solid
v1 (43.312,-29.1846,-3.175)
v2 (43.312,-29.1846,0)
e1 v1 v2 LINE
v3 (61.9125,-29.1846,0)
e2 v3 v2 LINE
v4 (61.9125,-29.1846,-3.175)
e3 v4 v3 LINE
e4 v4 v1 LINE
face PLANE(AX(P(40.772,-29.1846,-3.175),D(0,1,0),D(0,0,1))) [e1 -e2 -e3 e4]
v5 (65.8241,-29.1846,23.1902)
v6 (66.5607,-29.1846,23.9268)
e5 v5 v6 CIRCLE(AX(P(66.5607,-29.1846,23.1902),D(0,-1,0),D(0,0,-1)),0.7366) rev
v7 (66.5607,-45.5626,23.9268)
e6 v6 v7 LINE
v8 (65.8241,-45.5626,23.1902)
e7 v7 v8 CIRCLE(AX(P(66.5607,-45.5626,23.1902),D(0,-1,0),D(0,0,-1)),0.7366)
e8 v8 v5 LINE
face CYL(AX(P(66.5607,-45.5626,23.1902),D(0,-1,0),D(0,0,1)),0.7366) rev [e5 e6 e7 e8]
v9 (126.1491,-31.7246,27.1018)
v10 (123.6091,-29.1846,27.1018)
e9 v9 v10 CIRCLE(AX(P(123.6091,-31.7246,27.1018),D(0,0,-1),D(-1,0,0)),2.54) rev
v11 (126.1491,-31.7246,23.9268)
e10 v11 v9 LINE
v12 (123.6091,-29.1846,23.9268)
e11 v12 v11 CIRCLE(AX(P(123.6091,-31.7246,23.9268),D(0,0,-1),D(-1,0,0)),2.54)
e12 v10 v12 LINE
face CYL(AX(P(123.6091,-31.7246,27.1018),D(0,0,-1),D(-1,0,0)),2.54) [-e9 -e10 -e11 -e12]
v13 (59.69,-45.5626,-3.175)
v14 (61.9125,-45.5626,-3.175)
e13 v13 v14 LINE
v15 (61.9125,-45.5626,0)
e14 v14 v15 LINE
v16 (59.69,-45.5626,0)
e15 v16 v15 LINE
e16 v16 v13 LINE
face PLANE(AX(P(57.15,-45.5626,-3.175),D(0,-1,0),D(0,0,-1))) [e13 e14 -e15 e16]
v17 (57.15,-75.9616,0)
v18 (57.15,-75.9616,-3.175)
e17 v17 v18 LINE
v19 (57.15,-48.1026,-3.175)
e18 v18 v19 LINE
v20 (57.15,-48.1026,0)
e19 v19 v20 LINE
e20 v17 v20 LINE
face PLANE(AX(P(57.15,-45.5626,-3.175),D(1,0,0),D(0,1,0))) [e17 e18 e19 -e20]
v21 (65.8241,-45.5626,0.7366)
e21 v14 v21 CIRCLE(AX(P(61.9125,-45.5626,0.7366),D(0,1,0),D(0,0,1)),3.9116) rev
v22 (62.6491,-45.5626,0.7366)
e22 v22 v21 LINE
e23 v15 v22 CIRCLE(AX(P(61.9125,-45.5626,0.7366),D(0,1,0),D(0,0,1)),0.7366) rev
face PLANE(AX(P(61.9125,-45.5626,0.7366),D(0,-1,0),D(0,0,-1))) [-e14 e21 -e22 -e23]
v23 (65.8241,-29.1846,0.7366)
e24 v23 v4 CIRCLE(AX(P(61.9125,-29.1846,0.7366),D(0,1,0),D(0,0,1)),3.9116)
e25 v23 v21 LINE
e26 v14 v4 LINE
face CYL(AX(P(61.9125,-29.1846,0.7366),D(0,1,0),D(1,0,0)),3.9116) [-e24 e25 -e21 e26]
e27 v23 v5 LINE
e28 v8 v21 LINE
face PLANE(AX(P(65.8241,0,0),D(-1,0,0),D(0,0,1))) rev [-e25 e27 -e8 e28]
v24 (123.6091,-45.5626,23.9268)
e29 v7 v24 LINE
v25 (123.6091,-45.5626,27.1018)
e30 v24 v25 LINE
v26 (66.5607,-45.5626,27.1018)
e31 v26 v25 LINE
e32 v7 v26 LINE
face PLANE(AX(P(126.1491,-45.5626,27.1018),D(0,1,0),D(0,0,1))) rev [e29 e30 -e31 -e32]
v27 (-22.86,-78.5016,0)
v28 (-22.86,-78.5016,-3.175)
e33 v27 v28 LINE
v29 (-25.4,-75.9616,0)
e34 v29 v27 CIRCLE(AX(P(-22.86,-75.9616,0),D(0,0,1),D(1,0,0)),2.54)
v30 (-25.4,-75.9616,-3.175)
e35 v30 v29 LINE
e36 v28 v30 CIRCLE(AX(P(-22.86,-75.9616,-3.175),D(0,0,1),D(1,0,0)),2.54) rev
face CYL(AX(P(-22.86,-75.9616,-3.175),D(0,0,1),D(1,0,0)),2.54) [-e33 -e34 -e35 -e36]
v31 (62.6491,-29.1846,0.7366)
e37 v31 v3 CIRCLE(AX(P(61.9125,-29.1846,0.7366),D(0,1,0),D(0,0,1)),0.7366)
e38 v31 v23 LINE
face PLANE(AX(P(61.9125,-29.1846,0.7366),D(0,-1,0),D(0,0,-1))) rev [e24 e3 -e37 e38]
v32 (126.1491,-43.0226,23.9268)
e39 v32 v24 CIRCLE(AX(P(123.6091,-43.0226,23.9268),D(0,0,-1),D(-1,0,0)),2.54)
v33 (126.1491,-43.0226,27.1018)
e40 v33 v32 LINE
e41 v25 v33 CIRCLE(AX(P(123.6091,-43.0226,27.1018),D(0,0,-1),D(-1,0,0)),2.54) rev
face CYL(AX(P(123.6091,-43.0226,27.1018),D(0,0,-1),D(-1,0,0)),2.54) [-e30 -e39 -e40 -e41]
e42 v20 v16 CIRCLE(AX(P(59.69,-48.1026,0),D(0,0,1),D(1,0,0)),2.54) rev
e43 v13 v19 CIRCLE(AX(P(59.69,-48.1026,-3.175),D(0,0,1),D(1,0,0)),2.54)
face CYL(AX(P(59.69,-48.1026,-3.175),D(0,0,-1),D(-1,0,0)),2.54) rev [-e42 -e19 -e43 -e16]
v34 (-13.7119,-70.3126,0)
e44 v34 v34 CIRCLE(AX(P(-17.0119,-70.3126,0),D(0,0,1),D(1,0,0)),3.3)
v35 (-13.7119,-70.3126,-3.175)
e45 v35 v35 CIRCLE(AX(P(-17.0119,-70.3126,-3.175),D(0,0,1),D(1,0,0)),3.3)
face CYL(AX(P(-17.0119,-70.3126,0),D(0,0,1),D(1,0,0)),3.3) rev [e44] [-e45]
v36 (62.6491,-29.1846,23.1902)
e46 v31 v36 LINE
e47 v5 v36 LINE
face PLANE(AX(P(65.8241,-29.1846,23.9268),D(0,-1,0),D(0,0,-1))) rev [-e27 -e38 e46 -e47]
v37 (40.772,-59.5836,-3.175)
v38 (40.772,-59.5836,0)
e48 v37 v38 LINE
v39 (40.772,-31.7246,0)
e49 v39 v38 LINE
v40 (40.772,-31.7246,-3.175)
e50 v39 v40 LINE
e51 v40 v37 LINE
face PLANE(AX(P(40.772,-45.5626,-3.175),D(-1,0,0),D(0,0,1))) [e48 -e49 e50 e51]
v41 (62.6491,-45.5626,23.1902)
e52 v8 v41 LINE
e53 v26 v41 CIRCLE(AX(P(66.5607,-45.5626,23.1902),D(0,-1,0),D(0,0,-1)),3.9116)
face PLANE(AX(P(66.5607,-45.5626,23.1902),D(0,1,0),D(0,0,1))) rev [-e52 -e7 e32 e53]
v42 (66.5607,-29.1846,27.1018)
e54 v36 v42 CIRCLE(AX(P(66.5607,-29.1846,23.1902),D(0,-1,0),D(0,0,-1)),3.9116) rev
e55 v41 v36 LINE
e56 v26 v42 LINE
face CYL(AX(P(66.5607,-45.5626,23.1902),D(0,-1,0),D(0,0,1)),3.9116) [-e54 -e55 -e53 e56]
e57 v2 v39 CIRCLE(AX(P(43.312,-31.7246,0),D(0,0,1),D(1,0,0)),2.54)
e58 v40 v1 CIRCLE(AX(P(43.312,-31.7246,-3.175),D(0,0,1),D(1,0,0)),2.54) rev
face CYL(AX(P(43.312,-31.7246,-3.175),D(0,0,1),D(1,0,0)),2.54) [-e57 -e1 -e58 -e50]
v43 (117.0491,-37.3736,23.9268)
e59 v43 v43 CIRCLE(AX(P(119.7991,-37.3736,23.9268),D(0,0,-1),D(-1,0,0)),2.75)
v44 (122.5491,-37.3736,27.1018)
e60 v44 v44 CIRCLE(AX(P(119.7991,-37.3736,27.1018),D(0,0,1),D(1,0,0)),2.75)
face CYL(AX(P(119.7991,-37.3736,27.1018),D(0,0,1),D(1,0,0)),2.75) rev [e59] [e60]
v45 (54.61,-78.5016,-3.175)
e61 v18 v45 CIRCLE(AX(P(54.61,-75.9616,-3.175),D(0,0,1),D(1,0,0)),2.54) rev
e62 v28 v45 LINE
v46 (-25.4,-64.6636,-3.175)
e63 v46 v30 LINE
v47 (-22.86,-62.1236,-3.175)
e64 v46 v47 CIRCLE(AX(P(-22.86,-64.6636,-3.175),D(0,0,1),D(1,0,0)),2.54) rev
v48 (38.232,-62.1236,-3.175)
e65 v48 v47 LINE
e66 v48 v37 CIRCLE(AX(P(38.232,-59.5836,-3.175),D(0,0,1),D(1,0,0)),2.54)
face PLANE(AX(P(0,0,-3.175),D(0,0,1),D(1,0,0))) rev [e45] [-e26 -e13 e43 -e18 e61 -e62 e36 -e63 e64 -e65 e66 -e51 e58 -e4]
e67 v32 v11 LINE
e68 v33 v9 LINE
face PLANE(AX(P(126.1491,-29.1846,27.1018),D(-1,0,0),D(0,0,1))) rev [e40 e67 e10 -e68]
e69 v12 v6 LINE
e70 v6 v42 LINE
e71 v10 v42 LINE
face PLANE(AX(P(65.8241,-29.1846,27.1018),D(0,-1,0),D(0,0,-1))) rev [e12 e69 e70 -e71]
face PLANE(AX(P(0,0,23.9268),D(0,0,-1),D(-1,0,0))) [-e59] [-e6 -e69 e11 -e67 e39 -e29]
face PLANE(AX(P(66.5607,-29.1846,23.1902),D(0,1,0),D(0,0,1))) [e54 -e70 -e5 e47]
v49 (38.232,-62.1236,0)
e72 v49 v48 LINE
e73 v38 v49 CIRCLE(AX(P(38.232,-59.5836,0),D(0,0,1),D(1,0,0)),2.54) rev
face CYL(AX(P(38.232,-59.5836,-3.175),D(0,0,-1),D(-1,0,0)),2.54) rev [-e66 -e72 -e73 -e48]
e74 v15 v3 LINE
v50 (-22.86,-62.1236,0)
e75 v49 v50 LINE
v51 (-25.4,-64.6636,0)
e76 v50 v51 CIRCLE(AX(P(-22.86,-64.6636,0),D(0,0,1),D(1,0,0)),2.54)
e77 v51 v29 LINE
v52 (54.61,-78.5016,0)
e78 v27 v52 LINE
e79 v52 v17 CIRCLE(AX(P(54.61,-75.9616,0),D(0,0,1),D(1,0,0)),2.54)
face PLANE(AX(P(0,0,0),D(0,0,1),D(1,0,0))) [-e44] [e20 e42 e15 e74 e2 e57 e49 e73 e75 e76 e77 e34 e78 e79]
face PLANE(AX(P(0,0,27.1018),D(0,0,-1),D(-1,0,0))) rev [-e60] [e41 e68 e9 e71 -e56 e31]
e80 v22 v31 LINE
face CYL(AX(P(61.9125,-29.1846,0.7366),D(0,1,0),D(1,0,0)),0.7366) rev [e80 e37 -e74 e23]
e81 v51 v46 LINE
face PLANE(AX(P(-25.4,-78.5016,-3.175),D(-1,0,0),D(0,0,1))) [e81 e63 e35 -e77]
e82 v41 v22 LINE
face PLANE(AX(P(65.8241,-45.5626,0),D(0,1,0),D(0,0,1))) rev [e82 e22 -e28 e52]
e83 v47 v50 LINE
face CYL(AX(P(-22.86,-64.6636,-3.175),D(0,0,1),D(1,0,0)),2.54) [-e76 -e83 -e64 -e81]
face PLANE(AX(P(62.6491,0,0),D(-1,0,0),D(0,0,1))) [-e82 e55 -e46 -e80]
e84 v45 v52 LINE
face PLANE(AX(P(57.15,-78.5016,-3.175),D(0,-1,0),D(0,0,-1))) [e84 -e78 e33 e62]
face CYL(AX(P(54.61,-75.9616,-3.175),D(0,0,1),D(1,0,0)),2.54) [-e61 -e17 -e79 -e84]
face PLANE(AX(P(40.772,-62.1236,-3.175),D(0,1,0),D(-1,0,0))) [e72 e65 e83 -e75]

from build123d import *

# Parameters (mm, degrees)
BASE_FLANGE1_DEPTH           = 3.175
EDGE_FLANGE1_DEPTH           = 16.378
EDGE_FLANGE2_STRIP_W         = 14.1732
EDGE_FLANGE2_STRIP_H         = 3.175
EDGE_FLANGE2_STRIP_CUT_DEPTH = 16.378
EDGE_FLANGE2_DEPTH           = 16.378
M5_CLEARANCE_HOLE1_D         = 5.5
M6_CLEARANCE_HOLE1_D         = 6.6
FILLET1_R                    = 2.54


# Sheet-metal steps are written as plain solids
with BuildPart() as part:
    # Sketch1 → Base-Flange1 (new body)
    with BuildSketch(Plane.XY):
        Polygon((40.772, -29.184600001), (40.772, -45.562600001), (40.772, -62.123600001), (-25.39999999, -62.123600001), (-25.39999999, -78.501600001), (57.15000001, -78.501600001), (57.15000001, -45.562600001), (61.9125, -45.562600001), (61.9125, -29.184600001), align=None)
    extrude(amount=-BASE_FLANGE1_DEPTH)

    # Edge-Flange1 section (across the edge) → Edge-Flange1 (add)
    with BuildSketch(Plane(origin=(62.6491, -45.562600001, 0), x_dir=(-1, 0, 0), z_dir=(0, 1, 0))):
        with BuildLine():
            Line((-3.175, 0.7366), (-3.175, 23.9268))
            Line((-3.175, 23.9268), (0, 23.9268))
            Line((0, 23.9268), (0, 0.7366))
            ThreePointArc((0, 0.7366), (0.215745145, 0.215745145), (0.7366, 0))
            Line((0.7366, 0), (0.7366, -3.175))
            ThreePointArc((0.7366, -3.175), (-2.029318885, -2.029318885), (-3.175, 0.7366))
        make_face()
    extrude(amount=EDGE_FLANGE1_DEPTH)

    # Edge-Flange2 strip (across the edge) → Edge-Flange2 strip cut (cut)
    with BuildSketch(Plane(origin=(65.8241, -29.184600001, 23.9268), x_dir=(0, 0, -1), z_dir=(0, -1, 0))):
        with Locations((-6.35, -1.5875)):
            Rectangle(EDGE_FLANGE2_STRIP_W, EDGE_FLANGE2_STRIP_H)
    extrude(amount=EDGE_FLANGE2_STRIP_CUT_DEPTH, mode=Mode.SUBTRACT)

    # Edge-Flange2 section (across the edge) → Edge-Flange2 (add)
    with BuildSketch(Plane(origin=(65.8241, -29.184600001, 23.9268), x_dir=(0, 0, -1), z_dir=(0, -1, 0))):
        with BuildLine():
            Line((-3.175, 0.7366), (-3.175, 60.325))
            Line((-3.175, 60.325), (0, 60.325))
            Line((0, 60.325), (0, 0.7366))
            ThreePointArc((0, 0.7366), (0.215745145, 0.215745145), (0.7366, 0))
            Line((0.7366, 0), (0.7366, -3.175))
            ThreePointArc((0.7366, -3.175), (-2.029318885, -2.029318885), (-3.175, 0.7366))
        make_face()
    extrude(amount=EDGE_FLANGE2_DEPTH)

    # M5 Clearance Hole1 (through all)
    with Locations(Plane.XY.offset(27.1018)):
        with Locations((119.7991, -37.373600001)):
            Hole(M5_CLEARANCE_HOLE1_D / 2)

    # M6 Clearance Hole1 (through all)
    with Locations(Plane.XY):
        with Locations((-17.0119, -70.312600001)):
            Hole(M6_CLEARANCE_HOLE1_D / 2)

    # Fillet1
    fillet1_edges = [part.edges().sort_by_distance(p)[0] for p in [
        (-25.39999999, -62.123600001, -1.5875),
        (40.772, -62.123600001, -1.5875),
        (40.772, -29.184600001, -1.5875),
        (57.15000001, -45.562600001, -1.5875),
        (57.15000001, -78.501600001, -1.5875),
        (-25.39999999, -78.501600001, -1.5875),
        (126.1491, -29.184600001, 25.5143),
        (126.1491, -45.562600001, 25.5143),
    ]]
    fillet(fillet1_edges, radius=FILLET1_R)


solid = part.part
